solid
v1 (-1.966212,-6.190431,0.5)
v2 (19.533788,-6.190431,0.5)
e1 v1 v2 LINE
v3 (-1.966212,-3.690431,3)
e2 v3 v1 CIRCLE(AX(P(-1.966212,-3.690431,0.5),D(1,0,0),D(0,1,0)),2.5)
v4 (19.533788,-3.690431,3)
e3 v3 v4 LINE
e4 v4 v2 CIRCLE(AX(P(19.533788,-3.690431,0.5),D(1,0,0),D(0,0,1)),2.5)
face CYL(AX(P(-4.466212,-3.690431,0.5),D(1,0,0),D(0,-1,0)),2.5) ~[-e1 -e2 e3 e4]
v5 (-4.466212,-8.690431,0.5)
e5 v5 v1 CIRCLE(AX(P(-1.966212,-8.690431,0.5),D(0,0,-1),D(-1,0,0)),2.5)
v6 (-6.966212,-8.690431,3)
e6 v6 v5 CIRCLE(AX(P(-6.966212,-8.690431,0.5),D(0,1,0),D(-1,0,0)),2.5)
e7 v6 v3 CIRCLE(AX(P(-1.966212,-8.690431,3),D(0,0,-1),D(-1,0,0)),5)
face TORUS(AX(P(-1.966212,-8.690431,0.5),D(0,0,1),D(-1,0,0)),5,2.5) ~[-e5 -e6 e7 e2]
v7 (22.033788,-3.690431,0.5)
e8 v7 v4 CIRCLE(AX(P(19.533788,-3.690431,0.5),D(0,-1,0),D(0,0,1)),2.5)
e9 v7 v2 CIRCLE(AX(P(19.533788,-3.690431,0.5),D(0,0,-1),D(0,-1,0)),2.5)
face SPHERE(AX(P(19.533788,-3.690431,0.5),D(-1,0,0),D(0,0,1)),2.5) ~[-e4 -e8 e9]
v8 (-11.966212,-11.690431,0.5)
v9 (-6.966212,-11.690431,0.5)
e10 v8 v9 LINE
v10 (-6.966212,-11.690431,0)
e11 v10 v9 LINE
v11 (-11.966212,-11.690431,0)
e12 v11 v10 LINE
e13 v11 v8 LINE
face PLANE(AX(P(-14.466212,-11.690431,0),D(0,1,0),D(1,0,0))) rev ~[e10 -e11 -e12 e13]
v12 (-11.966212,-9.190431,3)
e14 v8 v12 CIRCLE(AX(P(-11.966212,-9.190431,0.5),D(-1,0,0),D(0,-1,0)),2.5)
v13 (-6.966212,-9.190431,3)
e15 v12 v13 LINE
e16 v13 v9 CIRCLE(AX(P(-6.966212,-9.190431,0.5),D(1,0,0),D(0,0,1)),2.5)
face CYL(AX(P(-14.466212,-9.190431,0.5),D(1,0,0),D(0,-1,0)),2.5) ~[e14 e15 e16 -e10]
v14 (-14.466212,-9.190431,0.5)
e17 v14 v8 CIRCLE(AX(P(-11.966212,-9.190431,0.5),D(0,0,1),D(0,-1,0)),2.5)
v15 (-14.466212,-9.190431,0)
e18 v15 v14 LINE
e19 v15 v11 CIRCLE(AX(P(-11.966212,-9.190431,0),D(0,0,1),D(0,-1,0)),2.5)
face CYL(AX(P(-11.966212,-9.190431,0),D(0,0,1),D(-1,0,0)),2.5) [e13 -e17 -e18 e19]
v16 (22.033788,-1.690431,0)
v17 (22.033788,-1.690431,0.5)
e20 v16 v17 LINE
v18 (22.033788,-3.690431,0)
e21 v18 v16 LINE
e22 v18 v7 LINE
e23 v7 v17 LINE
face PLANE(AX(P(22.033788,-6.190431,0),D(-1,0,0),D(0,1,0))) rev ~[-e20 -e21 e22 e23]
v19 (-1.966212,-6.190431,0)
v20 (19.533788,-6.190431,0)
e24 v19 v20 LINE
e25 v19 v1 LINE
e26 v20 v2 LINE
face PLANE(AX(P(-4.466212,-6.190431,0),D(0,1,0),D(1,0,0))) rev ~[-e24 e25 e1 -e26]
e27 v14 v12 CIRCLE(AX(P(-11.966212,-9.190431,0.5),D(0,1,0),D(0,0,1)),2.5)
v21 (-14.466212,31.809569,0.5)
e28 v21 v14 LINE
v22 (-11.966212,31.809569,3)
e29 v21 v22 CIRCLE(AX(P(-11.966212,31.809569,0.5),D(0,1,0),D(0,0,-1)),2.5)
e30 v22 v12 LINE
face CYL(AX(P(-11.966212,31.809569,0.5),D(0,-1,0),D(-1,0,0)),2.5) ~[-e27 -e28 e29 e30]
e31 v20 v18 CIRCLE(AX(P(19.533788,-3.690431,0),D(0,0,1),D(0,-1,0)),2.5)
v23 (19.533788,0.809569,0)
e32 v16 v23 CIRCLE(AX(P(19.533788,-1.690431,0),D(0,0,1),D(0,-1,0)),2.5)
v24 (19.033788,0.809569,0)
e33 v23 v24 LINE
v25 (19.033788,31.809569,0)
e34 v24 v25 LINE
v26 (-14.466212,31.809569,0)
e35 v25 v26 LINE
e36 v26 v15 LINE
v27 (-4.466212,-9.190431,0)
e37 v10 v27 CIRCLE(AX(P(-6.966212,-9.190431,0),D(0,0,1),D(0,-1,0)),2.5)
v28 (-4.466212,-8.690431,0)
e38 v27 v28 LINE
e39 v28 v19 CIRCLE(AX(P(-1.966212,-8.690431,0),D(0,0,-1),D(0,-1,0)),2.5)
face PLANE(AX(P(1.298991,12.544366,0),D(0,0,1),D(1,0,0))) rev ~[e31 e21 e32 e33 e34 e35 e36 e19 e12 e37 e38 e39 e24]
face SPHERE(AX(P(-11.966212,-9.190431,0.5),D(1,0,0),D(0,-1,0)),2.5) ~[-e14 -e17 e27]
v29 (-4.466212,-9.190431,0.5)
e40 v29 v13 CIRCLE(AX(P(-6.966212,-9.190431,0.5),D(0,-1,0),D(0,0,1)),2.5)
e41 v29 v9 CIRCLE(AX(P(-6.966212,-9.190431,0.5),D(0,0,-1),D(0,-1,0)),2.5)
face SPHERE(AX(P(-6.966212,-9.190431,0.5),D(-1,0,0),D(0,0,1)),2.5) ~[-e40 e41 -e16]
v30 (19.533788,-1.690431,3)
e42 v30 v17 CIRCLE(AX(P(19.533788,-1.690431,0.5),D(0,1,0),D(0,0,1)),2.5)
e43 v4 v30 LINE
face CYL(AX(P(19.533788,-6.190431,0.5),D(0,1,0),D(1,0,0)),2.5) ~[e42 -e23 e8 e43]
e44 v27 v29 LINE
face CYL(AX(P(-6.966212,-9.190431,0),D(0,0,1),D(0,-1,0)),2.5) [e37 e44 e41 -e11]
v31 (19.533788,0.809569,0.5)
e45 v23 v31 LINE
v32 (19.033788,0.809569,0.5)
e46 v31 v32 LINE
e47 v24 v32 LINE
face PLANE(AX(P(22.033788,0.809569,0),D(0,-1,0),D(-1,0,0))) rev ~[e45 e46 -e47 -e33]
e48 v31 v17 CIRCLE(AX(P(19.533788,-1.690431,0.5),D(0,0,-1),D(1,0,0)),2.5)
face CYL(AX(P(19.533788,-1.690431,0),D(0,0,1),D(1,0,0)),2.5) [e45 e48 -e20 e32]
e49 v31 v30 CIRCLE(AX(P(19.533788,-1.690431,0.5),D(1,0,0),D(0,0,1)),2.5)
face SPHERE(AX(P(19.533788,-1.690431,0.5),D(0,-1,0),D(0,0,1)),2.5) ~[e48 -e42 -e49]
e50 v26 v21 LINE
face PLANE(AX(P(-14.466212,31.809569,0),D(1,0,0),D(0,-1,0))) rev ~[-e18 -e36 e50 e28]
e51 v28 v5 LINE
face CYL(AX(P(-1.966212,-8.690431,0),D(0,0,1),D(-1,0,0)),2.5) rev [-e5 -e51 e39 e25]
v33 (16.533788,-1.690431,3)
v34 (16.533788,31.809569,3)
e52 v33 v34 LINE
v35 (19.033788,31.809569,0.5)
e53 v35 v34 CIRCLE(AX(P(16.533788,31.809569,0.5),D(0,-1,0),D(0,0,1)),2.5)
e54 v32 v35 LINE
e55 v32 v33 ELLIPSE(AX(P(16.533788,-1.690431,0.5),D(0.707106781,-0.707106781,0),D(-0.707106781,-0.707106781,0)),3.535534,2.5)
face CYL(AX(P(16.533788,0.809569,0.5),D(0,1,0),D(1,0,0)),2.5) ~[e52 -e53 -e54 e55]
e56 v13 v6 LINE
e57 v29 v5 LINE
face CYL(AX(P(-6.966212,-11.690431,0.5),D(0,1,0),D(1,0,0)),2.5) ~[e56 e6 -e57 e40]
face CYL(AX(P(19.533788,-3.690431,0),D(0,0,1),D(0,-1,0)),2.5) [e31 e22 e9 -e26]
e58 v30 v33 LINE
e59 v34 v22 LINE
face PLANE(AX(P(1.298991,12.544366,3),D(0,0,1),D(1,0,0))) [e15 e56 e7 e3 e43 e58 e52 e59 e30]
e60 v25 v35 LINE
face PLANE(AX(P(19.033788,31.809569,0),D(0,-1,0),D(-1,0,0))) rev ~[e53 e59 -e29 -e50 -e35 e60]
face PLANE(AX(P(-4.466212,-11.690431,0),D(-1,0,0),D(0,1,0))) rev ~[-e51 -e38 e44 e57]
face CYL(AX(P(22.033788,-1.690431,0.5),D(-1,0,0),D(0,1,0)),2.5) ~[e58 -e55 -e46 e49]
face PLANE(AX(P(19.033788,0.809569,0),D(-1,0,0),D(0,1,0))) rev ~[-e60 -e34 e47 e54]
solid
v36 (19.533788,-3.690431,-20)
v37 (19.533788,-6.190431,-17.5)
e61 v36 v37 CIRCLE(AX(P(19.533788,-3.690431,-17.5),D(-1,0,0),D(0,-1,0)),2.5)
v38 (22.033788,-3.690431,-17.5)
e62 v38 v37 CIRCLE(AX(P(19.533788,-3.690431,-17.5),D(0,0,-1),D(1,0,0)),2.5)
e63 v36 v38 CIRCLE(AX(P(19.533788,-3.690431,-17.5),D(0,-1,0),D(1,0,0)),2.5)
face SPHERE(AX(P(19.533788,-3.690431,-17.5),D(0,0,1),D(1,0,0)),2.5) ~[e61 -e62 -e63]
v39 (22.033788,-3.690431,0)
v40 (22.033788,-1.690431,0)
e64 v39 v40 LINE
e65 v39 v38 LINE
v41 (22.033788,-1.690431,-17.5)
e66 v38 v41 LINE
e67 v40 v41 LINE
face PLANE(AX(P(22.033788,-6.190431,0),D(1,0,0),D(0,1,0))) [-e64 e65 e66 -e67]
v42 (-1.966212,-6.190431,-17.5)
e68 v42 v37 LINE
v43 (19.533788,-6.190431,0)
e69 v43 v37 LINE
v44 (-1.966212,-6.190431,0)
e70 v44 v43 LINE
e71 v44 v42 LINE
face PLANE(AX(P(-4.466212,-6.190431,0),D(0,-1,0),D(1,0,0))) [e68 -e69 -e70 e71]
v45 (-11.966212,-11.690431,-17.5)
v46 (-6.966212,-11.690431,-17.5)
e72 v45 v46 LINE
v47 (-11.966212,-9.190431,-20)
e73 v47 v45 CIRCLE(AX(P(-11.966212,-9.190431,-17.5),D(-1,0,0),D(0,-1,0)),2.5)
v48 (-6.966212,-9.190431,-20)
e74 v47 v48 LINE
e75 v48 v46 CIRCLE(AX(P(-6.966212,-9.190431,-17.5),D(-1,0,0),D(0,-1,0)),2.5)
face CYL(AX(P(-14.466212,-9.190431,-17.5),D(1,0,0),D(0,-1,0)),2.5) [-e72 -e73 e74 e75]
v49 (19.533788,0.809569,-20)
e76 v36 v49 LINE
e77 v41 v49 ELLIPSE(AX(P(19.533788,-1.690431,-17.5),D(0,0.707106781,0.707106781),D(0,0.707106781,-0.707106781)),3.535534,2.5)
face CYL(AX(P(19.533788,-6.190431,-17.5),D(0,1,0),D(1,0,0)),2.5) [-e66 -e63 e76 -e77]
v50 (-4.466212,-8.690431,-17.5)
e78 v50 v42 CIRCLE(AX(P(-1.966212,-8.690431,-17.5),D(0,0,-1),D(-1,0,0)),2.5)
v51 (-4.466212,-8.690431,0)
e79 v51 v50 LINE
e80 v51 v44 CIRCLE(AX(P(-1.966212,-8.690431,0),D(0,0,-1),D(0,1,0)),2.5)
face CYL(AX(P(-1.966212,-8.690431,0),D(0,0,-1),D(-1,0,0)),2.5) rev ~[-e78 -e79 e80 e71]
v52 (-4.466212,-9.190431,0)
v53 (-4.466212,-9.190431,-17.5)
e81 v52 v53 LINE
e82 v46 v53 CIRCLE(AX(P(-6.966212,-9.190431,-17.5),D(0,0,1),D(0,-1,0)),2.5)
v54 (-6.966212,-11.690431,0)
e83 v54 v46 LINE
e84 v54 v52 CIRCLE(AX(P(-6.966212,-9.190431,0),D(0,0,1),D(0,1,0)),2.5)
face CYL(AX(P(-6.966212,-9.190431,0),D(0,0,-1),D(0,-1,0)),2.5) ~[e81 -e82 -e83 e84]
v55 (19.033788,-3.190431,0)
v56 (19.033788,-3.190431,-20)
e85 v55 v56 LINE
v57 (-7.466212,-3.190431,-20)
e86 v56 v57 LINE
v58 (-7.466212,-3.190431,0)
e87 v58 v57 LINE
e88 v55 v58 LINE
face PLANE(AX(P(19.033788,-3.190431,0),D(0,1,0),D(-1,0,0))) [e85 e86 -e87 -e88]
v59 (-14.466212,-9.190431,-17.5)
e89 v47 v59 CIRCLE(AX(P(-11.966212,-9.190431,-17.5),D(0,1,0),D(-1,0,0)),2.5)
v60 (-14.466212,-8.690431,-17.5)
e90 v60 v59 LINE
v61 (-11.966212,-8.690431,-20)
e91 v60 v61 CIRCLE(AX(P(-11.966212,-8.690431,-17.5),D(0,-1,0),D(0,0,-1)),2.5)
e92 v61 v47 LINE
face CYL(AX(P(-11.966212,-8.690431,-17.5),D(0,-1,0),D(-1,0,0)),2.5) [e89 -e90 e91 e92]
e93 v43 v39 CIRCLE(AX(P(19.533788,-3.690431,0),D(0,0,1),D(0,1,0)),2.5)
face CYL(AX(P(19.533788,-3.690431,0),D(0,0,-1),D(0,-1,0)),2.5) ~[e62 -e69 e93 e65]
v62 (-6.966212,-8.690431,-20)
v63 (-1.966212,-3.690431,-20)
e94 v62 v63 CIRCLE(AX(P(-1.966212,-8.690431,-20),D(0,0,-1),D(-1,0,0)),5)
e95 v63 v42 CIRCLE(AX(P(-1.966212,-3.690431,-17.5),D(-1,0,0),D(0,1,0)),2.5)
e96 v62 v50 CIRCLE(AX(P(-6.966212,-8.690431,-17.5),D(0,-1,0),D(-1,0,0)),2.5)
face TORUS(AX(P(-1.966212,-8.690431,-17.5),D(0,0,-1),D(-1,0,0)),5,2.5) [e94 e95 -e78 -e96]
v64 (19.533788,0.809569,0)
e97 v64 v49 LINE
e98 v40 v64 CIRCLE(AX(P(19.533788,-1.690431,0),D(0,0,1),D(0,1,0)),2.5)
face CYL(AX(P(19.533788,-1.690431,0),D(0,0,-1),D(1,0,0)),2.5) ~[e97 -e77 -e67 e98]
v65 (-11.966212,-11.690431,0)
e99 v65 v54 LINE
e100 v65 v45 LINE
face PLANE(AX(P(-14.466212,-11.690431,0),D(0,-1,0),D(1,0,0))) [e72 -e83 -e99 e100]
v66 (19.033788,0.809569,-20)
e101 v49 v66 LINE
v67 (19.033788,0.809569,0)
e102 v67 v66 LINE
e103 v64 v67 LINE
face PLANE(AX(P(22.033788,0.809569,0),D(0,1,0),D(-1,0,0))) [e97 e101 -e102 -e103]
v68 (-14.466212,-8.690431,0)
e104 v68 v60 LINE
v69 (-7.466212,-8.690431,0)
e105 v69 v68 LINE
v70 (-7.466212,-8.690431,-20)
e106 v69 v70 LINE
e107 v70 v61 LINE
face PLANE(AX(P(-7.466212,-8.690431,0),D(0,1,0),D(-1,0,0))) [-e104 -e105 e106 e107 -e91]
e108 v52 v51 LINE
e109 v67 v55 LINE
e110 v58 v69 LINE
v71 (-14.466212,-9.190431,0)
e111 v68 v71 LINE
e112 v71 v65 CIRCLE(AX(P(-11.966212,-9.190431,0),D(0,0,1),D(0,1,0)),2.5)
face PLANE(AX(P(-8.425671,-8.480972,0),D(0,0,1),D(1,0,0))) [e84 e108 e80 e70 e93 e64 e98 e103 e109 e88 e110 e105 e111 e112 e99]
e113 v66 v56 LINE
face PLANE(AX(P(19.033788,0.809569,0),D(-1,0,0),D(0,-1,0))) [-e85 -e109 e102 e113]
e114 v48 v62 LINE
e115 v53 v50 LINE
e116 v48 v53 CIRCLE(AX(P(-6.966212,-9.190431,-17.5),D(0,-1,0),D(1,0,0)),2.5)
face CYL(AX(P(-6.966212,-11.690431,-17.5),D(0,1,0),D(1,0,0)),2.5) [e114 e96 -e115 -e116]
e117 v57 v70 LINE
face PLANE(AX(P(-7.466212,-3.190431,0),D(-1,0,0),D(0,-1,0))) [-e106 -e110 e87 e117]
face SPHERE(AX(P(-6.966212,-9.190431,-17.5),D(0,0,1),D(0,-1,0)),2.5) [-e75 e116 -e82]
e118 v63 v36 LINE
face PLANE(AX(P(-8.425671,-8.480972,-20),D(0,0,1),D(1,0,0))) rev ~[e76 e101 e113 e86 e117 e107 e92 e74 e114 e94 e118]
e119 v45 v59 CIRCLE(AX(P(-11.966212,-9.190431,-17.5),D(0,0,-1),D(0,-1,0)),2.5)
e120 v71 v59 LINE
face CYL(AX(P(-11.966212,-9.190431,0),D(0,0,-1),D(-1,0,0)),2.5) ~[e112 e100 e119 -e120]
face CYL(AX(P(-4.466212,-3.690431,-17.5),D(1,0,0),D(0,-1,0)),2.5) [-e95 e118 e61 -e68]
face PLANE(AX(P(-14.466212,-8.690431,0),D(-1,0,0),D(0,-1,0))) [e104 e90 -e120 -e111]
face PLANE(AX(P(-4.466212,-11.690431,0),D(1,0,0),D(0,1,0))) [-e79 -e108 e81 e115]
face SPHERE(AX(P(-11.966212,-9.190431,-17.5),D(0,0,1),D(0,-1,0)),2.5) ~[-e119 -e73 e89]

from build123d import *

# Parameters (mm, degrees)
F0_W     = 23.5
F0_H     = 3
F1_DEPTH = 3
F2_DEPTH = 20
F3_R     = 2.5
F3_2_R   = 2.5


with BuildPart() as f1:
    # F0 (on Top) → F1 (new body)
    with BuildSketch(Plane.XY):
        Polygon((-14.4662116915, 31.8095687255), (-14.4662116915, -8.6904312745), (-7.4662116915, -8.6904312745), (-7.4662116915, -3.1904312745), (-4.4662116915, -3.1904312745), (19.0337883085, -3.1904312745), (19.0337883085, 0.8095687255), (19.0337883085, 31.8095687255), align=None)
        Polygon((-7.4662116915, -8.6904312745), (-14.4662116915, -8.6904312745), (-14.4662116915, -11.6904312745), (-7.4662116915, -11.6904312745), (-4.4662116915, -11.6904312745), (-4.4662116915, -6.1904312745), (-4.4662116915, -3.1904312745), (-7.4662116915, -3.1904312745), align=None)
        with Locations((7.2837883085, -4.6904312745)):
            Rectangle(F0_W, F0_H)
        Polygon((22.0337883085, 0.8095687255), (19.0337883085, 0.8095687255), (19.0337883085, -3.1904312745), (19.0337883085, -6.1904312745), (22.0337883085, -6.1904312745), (22.0337883085, -3.1904312745), align=None)
    extrude(amount=F1_DEPTH)

    # F3
    f3_edges = [f1.edges().sort_by_distance(p)[0] for p in [
        (-9.466212, -11.690431, 3),
        (-4.466212, -8.940431, 3),
        (8.783788, -6.190431, 3),
        (22.033788, -2.690431, 3),
        (22.033788, -6.190431, 1.5),
        (-4.466212, -11.690431, 1.5),
        (-4.466212, -6.190431, 1.5),
        (-14.466212, -11.690431, 1.5),
        (-14.466212, 10.059569, 3),
        (20.533788, 0.809569, 3),
        (22.033788, 0.809569, 1.5),
        (19.033788, 16.309569, 3),
    ]]
    fillet(f3_edges, radius=F3_R)


with BuildPart() as f2:
    # F0 (on Top) → F2 (new body)
    with BuildSketch(Plane.XY):
        Polygon((-7.4662116915, -8.6904312745), (-14.4662116915, -8.6904312745), (-14.4662116915, -11.6904312745), (-7.4662116915, -11.6904312745), (-4.4662116915, -11.6904312745), (-4.4662116915, -6.1904312745), (-4.4662116915, -3.1904312745), (-7.4662116915, -3.1904312745), align=None)
        with Locations((7.2837883085, -4.6904312745)):
            Rectangle(F0_W, F0_H)
        Polygon((22.0337883085, 0.8095687255), (19.0337883085, 0.8095687255), (19.0337883085, -3.1904312745), (19.0337883085, -6.1904312745), (22.0337883085, -6.1904312745), (22.0337883085, -3.1904312745), align=None)
    extrude(amount=-F2_DEPTH)

    # F3#2
    f3_2_edges = [f2.edges().sort_by_distance(p)[0] for p in [
        (22.033788, -6.190431, -10),
        (-4.466212, -11.690431, -10),
        (-4.466212, -6.190431, -10),
        (-14.466212, -11.690431, -10),
        (-9.466212, -11.690431, -20),
        (-4.466212, -8.940431, -20),
        (22.033788, -2.690431, -20),
        (-14.466212, -10.190431, -20),
        (22.033788, 0.809569, -10),
        (8.783788, -6.190431, -20),
    ]]
    fillet(f3_2_edges, radius=F3_2_R)


solid = Compound([f1.part, f2.part])
